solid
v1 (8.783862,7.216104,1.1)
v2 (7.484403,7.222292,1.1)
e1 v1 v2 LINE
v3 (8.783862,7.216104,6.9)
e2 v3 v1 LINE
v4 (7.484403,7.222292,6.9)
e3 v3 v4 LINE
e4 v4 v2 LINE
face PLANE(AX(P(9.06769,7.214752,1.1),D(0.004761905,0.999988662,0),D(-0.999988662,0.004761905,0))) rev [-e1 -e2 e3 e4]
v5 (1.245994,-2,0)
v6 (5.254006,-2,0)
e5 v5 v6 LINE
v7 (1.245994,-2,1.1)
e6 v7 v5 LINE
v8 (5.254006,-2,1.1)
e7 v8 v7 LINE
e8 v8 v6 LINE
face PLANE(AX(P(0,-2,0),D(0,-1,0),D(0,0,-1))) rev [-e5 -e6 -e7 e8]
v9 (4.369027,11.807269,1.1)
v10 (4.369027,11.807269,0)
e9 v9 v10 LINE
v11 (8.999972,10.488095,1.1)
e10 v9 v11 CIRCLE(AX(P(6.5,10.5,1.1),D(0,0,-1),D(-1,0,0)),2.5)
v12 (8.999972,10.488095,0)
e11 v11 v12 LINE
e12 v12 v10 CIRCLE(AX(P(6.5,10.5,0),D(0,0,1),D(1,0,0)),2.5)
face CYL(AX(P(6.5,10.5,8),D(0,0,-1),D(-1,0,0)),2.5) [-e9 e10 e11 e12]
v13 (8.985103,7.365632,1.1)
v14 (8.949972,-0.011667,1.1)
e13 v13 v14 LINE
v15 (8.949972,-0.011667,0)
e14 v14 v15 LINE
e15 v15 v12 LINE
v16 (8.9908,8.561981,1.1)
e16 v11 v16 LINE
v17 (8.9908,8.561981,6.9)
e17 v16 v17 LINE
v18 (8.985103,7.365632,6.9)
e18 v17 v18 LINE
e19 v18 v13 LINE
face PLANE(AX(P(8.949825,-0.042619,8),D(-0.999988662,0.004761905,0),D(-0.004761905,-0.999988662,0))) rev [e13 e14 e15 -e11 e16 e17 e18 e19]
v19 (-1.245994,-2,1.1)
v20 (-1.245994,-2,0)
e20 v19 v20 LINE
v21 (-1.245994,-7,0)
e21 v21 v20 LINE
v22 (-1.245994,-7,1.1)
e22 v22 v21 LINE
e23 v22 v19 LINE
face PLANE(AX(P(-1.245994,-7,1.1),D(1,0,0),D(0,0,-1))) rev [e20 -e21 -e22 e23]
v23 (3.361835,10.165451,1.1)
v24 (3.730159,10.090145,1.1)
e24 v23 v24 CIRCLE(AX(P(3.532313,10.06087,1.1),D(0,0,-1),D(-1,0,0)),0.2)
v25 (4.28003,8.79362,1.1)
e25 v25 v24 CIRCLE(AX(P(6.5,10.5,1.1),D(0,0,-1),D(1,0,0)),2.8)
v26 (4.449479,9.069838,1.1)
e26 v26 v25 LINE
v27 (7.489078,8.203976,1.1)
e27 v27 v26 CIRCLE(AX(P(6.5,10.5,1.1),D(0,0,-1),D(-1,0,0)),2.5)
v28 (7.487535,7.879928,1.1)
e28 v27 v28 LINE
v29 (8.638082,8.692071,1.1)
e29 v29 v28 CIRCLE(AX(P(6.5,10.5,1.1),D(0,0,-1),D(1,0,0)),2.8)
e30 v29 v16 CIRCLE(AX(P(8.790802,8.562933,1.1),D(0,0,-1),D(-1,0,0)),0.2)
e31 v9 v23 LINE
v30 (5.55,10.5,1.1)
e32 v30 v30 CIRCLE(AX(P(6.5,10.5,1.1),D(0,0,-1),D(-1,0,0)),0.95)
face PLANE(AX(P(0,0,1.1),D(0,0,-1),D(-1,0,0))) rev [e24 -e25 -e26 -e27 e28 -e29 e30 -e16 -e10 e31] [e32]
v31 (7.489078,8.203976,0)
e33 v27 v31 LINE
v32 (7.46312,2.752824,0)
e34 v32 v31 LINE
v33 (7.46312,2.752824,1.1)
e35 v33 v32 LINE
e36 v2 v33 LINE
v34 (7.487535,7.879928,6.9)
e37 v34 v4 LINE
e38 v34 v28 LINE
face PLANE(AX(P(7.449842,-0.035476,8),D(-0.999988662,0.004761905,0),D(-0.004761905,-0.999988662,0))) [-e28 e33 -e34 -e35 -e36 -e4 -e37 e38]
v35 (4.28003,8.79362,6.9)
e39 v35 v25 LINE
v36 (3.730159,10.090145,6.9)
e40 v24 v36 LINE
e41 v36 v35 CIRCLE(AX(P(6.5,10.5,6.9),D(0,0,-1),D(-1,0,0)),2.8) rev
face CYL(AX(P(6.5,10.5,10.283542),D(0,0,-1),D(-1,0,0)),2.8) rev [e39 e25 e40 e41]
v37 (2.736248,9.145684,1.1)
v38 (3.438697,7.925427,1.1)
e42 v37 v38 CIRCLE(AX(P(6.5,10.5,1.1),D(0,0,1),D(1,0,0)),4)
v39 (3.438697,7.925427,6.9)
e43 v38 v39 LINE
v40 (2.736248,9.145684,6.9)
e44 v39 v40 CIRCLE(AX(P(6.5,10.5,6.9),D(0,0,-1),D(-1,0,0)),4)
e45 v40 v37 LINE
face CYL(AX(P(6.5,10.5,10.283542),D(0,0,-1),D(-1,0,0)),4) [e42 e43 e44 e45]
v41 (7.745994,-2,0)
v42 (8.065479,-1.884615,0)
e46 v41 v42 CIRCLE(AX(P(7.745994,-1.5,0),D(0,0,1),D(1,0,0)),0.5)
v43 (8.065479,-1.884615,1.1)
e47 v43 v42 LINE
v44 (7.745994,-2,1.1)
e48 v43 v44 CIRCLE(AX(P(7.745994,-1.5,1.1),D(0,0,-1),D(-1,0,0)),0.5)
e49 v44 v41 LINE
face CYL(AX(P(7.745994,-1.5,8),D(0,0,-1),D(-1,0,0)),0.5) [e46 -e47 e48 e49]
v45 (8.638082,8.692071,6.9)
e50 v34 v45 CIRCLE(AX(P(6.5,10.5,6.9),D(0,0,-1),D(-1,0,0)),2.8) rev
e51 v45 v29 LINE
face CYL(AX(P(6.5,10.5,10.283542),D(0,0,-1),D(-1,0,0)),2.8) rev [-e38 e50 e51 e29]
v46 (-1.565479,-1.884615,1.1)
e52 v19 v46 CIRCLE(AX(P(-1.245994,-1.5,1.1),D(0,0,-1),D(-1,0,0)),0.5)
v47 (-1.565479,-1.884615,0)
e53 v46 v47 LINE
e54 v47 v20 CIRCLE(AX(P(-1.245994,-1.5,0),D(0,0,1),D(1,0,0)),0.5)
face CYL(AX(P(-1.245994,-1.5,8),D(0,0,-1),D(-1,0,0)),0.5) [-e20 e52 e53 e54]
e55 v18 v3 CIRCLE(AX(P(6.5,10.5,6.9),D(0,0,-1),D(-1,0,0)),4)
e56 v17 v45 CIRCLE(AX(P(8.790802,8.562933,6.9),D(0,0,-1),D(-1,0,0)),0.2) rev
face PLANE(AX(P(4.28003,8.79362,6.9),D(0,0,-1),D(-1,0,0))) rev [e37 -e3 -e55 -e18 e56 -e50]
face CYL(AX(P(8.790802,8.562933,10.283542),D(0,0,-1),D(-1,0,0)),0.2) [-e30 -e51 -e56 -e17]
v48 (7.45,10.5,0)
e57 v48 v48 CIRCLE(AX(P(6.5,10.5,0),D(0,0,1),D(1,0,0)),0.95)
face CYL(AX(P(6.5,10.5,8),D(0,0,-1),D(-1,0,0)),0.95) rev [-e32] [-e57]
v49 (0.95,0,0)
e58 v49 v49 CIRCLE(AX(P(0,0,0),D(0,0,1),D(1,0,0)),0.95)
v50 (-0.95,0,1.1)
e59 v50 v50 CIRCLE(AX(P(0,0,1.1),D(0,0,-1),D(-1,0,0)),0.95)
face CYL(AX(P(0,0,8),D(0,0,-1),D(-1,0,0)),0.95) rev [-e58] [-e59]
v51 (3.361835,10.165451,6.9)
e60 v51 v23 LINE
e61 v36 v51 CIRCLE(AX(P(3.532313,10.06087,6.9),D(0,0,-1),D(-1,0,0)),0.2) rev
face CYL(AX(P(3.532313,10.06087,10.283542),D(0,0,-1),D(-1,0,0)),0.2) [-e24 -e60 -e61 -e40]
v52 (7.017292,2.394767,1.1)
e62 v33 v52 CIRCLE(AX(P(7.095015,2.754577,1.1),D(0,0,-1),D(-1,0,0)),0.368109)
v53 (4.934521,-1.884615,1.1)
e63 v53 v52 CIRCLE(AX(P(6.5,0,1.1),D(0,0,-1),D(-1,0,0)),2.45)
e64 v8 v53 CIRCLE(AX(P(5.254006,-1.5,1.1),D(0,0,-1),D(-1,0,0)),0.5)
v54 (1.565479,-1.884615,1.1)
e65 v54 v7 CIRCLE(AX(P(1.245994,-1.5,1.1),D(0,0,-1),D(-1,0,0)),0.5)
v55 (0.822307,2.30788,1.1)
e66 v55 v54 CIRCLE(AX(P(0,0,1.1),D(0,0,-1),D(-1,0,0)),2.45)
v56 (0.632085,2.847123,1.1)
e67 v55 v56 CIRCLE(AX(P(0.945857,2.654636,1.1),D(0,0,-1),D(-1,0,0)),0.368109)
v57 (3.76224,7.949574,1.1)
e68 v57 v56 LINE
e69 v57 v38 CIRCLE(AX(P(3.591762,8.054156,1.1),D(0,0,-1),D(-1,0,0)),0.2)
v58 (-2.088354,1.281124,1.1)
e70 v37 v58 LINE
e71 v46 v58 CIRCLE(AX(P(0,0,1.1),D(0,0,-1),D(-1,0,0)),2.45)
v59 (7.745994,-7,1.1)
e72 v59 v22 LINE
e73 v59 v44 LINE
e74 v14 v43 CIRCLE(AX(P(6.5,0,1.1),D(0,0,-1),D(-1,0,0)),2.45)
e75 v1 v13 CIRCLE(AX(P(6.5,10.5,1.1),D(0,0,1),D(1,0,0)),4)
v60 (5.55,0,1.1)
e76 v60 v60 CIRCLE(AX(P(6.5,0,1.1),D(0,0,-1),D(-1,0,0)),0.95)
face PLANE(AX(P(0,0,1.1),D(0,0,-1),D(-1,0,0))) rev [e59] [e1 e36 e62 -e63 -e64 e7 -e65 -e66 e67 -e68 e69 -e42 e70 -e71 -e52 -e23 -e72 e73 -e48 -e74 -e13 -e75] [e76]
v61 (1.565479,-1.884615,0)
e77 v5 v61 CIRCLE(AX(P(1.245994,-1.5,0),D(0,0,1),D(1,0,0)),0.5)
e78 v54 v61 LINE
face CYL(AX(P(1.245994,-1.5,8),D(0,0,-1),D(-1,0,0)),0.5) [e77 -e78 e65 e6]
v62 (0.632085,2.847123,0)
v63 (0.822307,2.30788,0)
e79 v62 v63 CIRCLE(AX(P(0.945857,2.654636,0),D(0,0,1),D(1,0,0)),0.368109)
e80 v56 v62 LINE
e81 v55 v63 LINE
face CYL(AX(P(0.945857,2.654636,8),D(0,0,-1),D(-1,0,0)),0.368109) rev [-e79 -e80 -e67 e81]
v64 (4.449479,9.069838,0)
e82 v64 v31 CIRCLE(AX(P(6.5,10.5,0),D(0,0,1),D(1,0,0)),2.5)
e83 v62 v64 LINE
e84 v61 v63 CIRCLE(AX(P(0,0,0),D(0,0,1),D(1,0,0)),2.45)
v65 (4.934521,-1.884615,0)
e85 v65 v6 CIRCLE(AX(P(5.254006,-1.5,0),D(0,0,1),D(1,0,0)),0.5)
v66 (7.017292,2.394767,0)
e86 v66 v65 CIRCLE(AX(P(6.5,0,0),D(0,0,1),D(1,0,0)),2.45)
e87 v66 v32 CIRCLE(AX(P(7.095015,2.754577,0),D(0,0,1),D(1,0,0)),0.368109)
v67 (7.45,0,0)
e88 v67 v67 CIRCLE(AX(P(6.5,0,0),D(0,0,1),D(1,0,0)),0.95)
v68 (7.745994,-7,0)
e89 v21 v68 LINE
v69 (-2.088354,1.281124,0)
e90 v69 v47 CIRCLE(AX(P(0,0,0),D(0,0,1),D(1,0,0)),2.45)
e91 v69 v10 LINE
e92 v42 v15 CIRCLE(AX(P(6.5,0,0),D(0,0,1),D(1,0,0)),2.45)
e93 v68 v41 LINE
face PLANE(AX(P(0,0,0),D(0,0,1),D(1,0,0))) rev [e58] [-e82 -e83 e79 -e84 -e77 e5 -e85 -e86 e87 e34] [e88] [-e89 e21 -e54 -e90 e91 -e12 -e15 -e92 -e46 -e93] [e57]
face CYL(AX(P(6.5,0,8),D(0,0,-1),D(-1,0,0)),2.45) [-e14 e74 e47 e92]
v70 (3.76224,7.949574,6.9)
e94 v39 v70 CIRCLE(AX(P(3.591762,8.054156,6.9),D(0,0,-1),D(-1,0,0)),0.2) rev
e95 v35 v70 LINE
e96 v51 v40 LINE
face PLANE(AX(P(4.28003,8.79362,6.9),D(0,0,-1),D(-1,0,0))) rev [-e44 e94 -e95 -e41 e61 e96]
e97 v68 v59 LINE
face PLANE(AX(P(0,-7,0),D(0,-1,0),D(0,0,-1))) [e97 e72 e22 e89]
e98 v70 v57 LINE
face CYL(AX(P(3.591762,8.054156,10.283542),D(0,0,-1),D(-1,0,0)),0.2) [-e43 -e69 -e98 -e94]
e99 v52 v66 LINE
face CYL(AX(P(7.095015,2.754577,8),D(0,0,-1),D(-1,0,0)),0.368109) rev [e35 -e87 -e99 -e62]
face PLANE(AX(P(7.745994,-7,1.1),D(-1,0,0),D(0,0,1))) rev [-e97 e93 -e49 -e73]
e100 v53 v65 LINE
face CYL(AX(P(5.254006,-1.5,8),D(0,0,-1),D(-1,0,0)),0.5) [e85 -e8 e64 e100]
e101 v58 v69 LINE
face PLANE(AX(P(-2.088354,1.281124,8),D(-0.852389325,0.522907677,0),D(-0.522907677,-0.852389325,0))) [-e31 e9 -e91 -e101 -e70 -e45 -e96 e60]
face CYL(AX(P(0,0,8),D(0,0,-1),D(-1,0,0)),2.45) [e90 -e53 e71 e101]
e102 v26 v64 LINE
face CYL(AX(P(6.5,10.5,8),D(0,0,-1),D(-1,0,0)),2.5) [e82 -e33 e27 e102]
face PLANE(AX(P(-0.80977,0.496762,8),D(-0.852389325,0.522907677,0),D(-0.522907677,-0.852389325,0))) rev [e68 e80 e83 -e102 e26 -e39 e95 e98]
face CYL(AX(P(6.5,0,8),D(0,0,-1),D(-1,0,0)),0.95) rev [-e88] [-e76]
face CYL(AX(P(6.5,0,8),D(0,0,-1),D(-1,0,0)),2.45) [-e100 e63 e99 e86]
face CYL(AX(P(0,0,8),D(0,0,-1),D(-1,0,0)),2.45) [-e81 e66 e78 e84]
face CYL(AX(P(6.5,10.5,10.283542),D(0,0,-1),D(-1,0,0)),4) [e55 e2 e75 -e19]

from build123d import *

# Parameters (mm, degrees)
STOCK_BASE_SKEWED_1_OUTLINE_R = 0.95
STOCK_BASE_SKEWED_1_DEPTH     = 1.1
STOCK_BASE_SKEWED_1_START     = 1.1
STOCK_BASE_SKEWED_1_2_DEPTH   = 5.8
SKETCH1_W                     = 5.8
SKETCH1_H                     = 0.6
CUT_EXTRUDE1_DEPTH            = 18.76345965


# Read off the part's stored shape, not the designer's step: Stock-Base_skewed-1
with BuildPart() as part:
    # Stock-Base_skewed-1 outline → Stock-Base_skewed-1 (new body)
    with BuildSketch(Plane.XY):
        with BuildLine():
            Line((8.949972222, -0.011666667), (8.999971655, 10.488095238))
            ThreePointArc((8.999971655, 10.488095238), (7.184905048, 12.904351279), (4.369026688, 11.807269193))
            Line((4.369026688, 11.807269193), (-2.088353846, 1.281123809))
            ThreePointArc((-2.088353846, 1.281123809), (-2.417250501, -0.399249317), (-1.565479113, -1.884615385))
            ThreePointArc((-1.565479113, -1.884615385), (-1.415835135, -1.970269972), (-1.245993579, -2))
            Line((-1.245993579, -2), (-1.245993579, -7))
            Line((-1.245993579, -7), (7.745993579, -7))
            Line((7.745993579, -7), (7.745993579, -2))
            ThreePointArc((7.745993579, -2), (7.915835135, -1.970269972), (8.065479113, -1.884615385))
            ThreePointArc((8.065479113, -1.884615385), (8.715388585, -1.046209071), (8.949972222, -0.011666667))
        make_face()
        with BuildLine():
            ThreePointArc((7.463119607, 2.75282442), (7.325518036, 2.467571215), (7.017292273, 2.394766941))
            ThreePointArc((7.017292273, 2.394766941), (4.297058288, 1.072169676), (4.934520887, -1.884615385))
            ThreePointArc((4.934520887, -1.884615385), (5.084164865, -1.970269972), (5.254006421, -2))
            Line((5.254006421, -2), (1.245993579, -2))
            ThreePointArc((1.245993579, -2), (1.415835135, -1.970269972), (1.565479113, -1.884615385))
            ThreePointArc((1.565479113, -1.884615385), (2.412392059, 0.427626653), (0.822306837, 2.307880297))
            ThreePointArc((0.822306837, 2.307880297), (0.598713954, 2.532178772), (0.632085047, 2.847123137))
            Line((0.632085047, 2.847123137), (4.449478669, 9.069838376))
            ThreePointArc((4.449478669, 9.069838376), (5.815094952, 8.095648721), (7.489077768, 8.203976226))
            Line((7.489077768, 8.203976226), (7.463119607, 2.75282442))
        make_face(mode=Mode.SUBTRACT)
        Circle(STOCK_BASE_SKEWED_1_OUTLINE_R, mode=Mode.SUBTRACT)
        with Locations((6.5, 0)):
            Circle(STOCK_BASE_SKEWED_1_OUTLINE_R, mode=Mode.SUBTRACT)
        with Locations((6.5, 10.5)):
            Circle(STOCK_BASE_SKEWED_1_OUTLINE_R, mode=Mode.SUBTRACT)
    extrude(amount=STOCK_BASE_SKEWED_1_DEPTH)

    # Stock-Base_skewed-1 2 outline → Stock-Base_skewed-1 2 (add)
    with BuildSketch(Plane.XY.offset(STOCK_BASE_SKEWED_1_START)):
        with BuildLine():
            Line((7.487534665, 7.879928382), (7.481545884, 6.622298661))
            ThreePointArc((7.481545884, 6.622298661), (8.272723591, 6.914271194), (8.985102612, 7.365631642))
            Line((8.985102612, 7.365631642), (8.990799579, 8.561981048))
            ThreePointArc((8.990799579, 8.561981048), (8.86000918, 8.750577627), (8.638081723, 8.6920712))
            ThreePointArc((8.638081723, 8.6920712), (8.114702276, 8.212482446), (7.487534665, 7.879928382))
        make_face()
        with BuildLine():
            Line((3.762240232, 7.94957426), (4.280029642, 8.793620321))
            ThreePointArc((4.280029642, 8.793620321), (3.922249334, 9.406747282), (3.73015902, 10.090145211))
            ThreePointArc((3.73015902, 10.090145211), (3.572375767, 10.256816274), (3.361835371, 10.165451404))
            Line((3.361835371, 10.165451404), (2.736247989, 9.14568438))
            ThreePointArc((2.736247989, 9.14568438), (3.033358957, 8.50440488), (3.438697229, 7.925427153))
            ThreePointArc((3.438697229, 7.925427153), (3.606647644, 7.854710493), (3.762240232, 7.94957426))
        make_face()
    extrude(amount=STOCK_BASE_SKEWED_1_2_DEPTH)

    # Sketch1 → Cut-Extrude1 (cut, through all)
    with BuildSketch(Plane(origin=(7.449841837, -0.03547584, 0), x_dir=(0, 0, 1), z_dir=(-0.999988662067245, 0.004761904761905177, 0))):
        with Locations((4, 6.957849986)):
            Rectangle(SKETCH1_W, SKETCH1_H)
    extrude(amount=-CUT_EXTRUDE1_DEPTH, mode=Mode.SUBTRACT)


solid = part.part
